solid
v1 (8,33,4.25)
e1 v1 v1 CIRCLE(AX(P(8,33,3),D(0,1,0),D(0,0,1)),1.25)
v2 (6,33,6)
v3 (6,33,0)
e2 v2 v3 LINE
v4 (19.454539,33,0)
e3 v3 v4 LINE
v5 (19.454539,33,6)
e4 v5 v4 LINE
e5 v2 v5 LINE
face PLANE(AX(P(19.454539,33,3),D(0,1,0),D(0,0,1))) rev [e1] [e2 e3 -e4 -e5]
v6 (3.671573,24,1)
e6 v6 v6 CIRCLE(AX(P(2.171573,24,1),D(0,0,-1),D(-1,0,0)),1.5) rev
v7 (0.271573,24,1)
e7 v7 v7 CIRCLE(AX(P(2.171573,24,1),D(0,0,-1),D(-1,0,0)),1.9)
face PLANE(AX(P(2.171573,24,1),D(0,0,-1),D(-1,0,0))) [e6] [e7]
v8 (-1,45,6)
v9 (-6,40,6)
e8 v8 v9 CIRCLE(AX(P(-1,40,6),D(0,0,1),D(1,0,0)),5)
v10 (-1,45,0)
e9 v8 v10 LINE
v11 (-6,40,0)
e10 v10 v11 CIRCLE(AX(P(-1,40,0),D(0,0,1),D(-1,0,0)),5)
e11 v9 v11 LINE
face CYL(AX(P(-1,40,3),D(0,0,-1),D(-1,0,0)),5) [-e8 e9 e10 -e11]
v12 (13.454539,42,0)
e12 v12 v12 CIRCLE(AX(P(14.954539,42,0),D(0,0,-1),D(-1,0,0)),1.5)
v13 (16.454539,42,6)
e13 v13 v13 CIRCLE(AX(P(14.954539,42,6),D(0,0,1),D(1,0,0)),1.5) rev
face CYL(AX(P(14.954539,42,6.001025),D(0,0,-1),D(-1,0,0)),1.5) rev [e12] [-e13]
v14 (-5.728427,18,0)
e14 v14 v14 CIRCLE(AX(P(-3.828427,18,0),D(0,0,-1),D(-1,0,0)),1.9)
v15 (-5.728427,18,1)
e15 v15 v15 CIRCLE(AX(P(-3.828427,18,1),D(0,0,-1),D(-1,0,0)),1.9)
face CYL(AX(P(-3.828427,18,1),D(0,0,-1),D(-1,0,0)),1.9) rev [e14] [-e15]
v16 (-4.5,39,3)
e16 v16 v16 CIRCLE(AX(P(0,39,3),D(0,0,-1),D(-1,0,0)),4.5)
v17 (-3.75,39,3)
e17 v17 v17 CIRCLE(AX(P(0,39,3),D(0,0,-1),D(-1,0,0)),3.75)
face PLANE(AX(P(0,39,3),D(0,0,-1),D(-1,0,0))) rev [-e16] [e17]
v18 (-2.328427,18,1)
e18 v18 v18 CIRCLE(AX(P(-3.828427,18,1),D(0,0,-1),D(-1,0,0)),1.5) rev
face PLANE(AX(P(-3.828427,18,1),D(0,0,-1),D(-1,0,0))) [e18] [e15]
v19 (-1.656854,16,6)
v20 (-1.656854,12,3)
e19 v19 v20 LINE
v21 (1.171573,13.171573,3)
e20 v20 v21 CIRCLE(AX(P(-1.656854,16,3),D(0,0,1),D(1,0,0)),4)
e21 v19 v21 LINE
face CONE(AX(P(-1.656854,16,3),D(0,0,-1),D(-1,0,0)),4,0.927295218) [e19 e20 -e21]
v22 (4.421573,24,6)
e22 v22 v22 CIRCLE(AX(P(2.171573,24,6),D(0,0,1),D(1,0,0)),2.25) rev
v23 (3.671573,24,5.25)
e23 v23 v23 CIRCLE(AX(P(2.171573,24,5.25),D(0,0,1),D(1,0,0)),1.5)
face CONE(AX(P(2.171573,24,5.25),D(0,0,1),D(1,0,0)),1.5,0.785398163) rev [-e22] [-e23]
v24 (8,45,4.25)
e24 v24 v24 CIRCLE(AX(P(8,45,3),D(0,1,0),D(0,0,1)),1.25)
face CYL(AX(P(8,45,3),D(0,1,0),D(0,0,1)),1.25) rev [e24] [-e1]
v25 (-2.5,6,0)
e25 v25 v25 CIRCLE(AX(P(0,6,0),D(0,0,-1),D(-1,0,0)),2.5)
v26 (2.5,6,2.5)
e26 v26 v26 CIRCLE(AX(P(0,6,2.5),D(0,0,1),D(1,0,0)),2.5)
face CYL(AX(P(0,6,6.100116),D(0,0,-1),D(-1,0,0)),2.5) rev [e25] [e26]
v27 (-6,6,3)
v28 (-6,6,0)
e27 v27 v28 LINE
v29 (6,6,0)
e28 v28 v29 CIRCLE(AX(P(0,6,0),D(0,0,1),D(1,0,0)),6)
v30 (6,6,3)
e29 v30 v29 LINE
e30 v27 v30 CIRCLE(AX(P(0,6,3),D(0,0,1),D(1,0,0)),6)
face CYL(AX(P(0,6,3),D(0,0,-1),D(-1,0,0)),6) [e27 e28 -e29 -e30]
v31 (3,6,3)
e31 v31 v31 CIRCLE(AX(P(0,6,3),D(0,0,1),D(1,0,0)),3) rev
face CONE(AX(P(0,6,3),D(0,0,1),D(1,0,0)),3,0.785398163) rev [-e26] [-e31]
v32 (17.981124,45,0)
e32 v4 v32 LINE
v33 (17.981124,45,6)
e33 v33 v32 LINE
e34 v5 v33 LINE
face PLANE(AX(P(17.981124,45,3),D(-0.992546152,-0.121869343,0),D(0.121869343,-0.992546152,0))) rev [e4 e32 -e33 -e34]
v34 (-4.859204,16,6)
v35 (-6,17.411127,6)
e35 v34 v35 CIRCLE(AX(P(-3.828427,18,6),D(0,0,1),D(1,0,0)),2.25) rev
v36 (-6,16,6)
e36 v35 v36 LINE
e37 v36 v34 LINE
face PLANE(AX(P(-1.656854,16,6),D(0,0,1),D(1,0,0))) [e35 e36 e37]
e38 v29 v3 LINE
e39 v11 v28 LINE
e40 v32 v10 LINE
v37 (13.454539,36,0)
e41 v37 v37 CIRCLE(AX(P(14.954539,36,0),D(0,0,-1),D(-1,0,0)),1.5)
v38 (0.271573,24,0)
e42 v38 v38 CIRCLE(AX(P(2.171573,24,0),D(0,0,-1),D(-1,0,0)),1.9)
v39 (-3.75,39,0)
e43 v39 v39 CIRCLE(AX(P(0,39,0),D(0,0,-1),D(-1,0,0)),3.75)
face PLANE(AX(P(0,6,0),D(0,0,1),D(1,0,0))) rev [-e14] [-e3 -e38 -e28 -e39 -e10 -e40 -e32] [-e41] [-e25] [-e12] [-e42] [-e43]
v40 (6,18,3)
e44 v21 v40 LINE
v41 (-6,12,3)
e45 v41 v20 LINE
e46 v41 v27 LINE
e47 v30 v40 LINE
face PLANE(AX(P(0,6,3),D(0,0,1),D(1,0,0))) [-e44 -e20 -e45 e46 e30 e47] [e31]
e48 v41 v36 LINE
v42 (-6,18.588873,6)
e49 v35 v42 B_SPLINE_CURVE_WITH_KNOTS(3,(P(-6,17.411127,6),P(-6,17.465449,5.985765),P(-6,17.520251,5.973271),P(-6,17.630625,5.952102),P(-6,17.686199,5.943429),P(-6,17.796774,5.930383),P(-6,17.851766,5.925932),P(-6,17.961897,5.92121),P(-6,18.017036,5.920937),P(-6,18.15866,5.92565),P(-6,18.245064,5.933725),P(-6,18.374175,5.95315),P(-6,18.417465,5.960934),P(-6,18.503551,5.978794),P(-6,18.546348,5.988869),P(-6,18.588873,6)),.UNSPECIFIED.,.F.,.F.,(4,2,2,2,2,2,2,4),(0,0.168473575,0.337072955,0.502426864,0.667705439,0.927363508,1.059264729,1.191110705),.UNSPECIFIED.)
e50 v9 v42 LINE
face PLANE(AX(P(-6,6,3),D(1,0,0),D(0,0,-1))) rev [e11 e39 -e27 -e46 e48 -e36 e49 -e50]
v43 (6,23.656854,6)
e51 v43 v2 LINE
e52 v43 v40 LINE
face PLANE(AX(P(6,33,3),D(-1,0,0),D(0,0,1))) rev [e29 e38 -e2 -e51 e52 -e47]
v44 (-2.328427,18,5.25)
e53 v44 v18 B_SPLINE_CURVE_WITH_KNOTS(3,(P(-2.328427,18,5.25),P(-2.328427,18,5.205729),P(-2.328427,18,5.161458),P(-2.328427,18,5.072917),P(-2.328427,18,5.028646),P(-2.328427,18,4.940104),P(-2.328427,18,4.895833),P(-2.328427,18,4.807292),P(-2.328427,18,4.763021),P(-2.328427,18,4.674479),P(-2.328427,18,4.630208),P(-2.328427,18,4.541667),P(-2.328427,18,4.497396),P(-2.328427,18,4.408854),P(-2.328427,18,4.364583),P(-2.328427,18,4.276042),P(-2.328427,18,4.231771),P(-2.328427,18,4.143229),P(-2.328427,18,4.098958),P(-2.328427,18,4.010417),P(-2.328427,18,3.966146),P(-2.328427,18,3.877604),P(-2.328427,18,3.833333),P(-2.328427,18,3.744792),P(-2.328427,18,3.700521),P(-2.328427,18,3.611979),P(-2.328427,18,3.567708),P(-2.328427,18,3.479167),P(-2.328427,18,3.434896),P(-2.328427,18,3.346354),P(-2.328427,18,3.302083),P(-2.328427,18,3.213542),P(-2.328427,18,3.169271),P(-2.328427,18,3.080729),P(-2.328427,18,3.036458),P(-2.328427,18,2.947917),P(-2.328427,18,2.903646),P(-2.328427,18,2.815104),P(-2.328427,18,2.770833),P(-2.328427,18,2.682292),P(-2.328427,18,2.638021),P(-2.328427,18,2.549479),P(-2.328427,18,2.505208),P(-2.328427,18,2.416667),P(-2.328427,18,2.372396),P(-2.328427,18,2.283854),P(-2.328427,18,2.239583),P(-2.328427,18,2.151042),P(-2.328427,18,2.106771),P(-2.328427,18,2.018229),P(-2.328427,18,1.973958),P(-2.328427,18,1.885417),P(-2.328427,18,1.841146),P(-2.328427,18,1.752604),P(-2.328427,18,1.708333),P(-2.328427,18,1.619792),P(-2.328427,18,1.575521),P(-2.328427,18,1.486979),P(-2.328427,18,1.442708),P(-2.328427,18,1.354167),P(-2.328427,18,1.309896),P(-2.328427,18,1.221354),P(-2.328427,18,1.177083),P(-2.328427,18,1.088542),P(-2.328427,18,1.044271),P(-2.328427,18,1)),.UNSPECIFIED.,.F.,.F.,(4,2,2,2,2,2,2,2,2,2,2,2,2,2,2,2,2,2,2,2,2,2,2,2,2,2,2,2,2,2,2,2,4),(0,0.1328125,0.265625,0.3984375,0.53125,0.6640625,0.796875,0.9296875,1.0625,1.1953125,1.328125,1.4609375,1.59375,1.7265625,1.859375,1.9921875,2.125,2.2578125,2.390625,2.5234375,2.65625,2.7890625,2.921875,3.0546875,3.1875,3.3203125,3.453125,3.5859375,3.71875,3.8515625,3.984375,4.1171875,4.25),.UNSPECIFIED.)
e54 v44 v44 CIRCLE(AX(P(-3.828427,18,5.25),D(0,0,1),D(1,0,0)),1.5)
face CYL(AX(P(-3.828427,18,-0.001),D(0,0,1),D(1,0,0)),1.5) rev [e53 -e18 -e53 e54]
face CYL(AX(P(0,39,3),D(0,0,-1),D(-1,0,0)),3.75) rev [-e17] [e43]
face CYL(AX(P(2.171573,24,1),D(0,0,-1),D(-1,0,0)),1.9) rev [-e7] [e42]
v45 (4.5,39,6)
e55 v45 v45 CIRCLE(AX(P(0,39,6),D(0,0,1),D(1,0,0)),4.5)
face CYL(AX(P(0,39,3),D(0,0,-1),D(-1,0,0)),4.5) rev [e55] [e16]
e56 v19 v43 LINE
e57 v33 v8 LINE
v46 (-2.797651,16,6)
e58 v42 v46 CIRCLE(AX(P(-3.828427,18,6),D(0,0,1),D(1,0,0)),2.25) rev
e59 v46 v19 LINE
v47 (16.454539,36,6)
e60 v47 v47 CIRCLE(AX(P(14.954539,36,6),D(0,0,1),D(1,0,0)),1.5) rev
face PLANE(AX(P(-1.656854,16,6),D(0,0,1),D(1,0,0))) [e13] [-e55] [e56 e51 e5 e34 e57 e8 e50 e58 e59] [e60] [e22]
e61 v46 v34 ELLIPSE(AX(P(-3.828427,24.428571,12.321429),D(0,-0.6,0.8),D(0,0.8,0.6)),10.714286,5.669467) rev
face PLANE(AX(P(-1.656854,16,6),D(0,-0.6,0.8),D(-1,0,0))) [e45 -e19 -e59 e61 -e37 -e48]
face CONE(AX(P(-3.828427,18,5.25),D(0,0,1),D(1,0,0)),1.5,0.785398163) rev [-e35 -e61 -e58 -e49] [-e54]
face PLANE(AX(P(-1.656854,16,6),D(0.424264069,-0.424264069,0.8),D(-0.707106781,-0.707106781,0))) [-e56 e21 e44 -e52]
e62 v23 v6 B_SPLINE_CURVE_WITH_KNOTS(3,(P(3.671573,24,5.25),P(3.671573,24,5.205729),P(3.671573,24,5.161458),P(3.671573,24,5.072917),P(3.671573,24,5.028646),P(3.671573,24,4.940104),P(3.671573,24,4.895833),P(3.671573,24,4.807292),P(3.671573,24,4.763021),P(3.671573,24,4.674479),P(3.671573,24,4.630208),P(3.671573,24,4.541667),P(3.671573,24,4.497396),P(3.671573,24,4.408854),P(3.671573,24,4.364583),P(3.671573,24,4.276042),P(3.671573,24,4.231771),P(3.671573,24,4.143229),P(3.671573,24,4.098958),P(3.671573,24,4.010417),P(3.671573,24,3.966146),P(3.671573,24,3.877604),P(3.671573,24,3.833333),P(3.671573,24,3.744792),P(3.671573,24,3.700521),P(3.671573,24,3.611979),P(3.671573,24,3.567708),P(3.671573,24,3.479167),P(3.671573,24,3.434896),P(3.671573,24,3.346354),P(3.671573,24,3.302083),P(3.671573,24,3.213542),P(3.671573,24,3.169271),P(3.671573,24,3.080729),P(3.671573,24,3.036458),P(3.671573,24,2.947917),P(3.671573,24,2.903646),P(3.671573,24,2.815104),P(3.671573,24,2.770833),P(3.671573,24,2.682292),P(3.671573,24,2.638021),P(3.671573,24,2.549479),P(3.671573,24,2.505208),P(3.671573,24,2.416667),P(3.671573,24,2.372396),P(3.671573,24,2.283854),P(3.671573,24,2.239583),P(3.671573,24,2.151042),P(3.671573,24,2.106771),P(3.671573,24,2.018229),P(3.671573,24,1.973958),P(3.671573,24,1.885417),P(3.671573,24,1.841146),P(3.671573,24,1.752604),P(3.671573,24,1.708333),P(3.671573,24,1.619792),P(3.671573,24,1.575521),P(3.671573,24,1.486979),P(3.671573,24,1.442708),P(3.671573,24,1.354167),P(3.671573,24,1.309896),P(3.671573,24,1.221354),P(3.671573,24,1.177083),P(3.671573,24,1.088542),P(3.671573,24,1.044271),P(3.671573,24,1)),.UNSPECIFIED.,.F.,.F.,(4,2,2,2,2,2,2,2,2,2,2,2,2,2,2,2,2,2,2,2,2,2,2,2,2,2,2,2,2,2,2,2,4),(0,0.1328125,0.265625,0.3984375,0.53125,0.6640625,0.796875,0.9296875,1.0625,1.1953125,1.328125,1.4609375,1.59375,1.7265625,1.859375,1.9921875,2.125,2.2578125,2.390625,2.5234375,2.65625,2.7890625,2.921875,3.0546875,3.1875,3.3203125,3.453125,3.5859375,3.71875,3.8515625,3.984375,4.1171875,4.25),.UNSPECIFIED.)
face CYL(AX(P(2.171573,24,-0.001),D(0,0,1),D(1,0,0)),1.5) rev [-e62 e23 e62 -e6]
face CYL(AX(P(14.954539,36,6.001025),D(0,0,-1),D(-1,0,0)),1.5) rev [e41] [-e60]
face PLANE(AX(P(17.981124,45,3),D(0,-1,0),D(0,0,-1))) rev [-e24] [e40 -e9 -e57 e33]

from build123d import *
from OCP.BRepFilletAPI import BRepFilletAPI_MakeChamfer

# Parameters (mm, degrees)
ESBO_O1_R                 = 4.5
RESSALTO_EXTRUS_O1_DEPTH  = 3
ESBO_O2_R                 = 4.5
RESSALTO_EXTRUS_O2_DEPTH  = 3
CHANFRO1_SIZE             = 4
CHANFRO1_SIZE_2           = 3
FURO_ROSCADO_DE_M3X0_51_D = 2.5
ESBO_O6_R                 = 4.5
ESBO_O6_R_2               = 3.75
RESSALTO_EXTRUS_O3_DEPTH  = 3
CORTE_EXTRUS_O1_REACH     = 51.391
ESBO_O7_R                 = 1.5
CORTE_EXTRUS_O2_REACH     = 51.391
ESBO_O8_R                 = 1.5
CHANFRO2_SIZE             = 0.75
CORTE_EXTRUS_O4_REACH     = 51.391
ESBO_O14_R                = 2.5
CHANFRO3_SIZE             = 0.5
ESBO_O15_R                = 1.9
CORTE_EXTRUS_O5_DEPTH     = 1


# Some blends are built 0.0001 mm under size
with BuildPart() as part:
    # Esboço1 → Ressalto-extrusão1 (new body)
    with BuildSketch(Plane.XY):
        with BuildLine():
            Line((-6, 6), (-6, 39))
            Line((-6, 39), (-6, 40))
            ThreePointArc((-6, 40), (-4.535533906, 43.535533906), (-1, 45))
            Line((-1, 45), (17.98112418, 45))
            Line((17.98112418, 45), (19.454538911, 33))
            Line((19.454538911, 33), (17.98112418, 33))
            Line((17.98112418, 33), (6, 33))
            Line((6, 33), (6, 25))
            Line((6, 25), (6, 6))
            ThreePointArc((6, 6), (4.242640687, 1.757359313), (0, 0))
            ThreePointArc((0, 0), (-4.242640687, 1.757359313), (-6, 6))
        make_face()
        with Locations((0, 39)):
            Circle(ESBO_O1_R, mode=Mode.SUBTRACT)
    extrude(amount=RESSALTO_EXTRUS_O1_DEPTH)

    # Esboço2 → Ressalto-extrusão2 (add)
    with BuildSketch(Plane.XY.offset(3)):
        with BuildLine():
            Line((6, 25), (6, 18))
            Line((6, 18), (1.171572875, 13.171572875))
            ThreePointArc((1.171572875, 13.171572875), (-0.12612052, 12.30448187), (-1.656854249, 12))
            Line((-1.656854249, 12), (-6, 12))
            Line((-6, 12), (-6, 25))
            Line((-6, 25), (-6, 40))
            ThreePointArc((-6, 40), (-4.535533906, 43.535533906), (-1, 45))
            Line((-1, 45), (17.98112418, 45))
            Line((17.98112418, 45), (19.454538911, 33))
            Line((19.454538911, 33), (6, 33))
            Line((6, 33), (6, 25))
        make_face()
        with Locations((0, 39)):
            Circle(ESBO_O2_R, mode=Mode.SUBTRACT)
    extrude(amount=RESSALTO_EXTRUS_O2_DEPTH)

    # Chanfro1
    chanfro1_edges_1 = [part.edges().sort_by_distance(p)[0] for p in [
        (3.585786438, 15.585786438, 6),
    ]]
    chanfro1_side_1 = [part.faces().sort_by_distance(p)[0] for p in [
        (3.543360031, 15.628212844, 6),
    ]]
    chanfro1_edges_2 = [part.edges().sort_by_distance(p)[0] for p in [
        (-0.12612052, 12.30448187, 6),
    ]]
    chanfro1_side_2 = [part.faces().sort_by_distance(p)[0] for p in [
        (-0.149081526, 12.359914642, 6),
    ]]
    chanfro1_edges_3 = [part.edges().sort_by_distance(p)[0] for p in [
        (-3.828427125, 12, 6),
    ]]
    chanfro1_side_3 = [part.faces().sort_by_distance(p)[0] for p in [
        (-3.828427125, 12, 5.94),
    ]]
    chanfro1 = BRepFilletAPI_MakeChamfer(part.part.solid().wrapped)
    for e in chanfro1_edges_1:
        chanfro1.Add(CHANFRO1_SIZE - 0.0001, CHANFRO1_SIZE_2 - 0.0001, e.wrapped, chanfro1_side_1[0].wrapped)
    for e in chanfro1_edges_2:
        chanfro1.Add(CHANFRO1_SIZE - 0.0001, CHANFRO1_SIZE_2 - 0.0001, e.wrapped, chanfro1_side_2[0].wrapped)
    for e in chanfro1_edges_3:
        chanfro1.Add(CHANFRO1_SIZE_2 - 0.0001, CHANFRO1_SIZE - 0.0001, e.wrapped, chanfro1_side_3[0].wrapped)
    add(Compound.cast(chanfro1.Shape()), mode=Mode.REPLACE)  # a hair under: the kernel refuses the full size

    # Furo roscado de M3x0.51 (through all)
    with Locations(Plane(origin=(0, 45, 0), x_dir=(1, 0, 0), z_dir=(0, 1, 0))):
        with Locations((8, -3)):
            Hole(FURO_ROSCADO_DE_M3X0_51_D / 2)

    # Esboço6 → Ressalto-extrusão3 (add)
    with BuildSketch(Plane(origin=(0, 0, 0), x_dir=(-1, 0, 0), z_dir=(0, 0, -1))):
        with Locations((0, 39)):
            Circle(ESBO_O6_R)
        with Locations((0, 39)):
            Circle(ESBO_O6_R_2, mode=Mode.SUBTRACT)
    extrude(amount=-RESSALTO_EXTRUS_O3_DEPTH)

    # Esboço7 → Corte-extrusão1 (cut, up to next)
    with BuildSketch(Plane(origin=(0, 0, 0), x_dir=(-1, 0, 0), z_dir=(0, 0, -1)), mode=Mode.PRIVATE) as corte_extrus_o1_sk1:
        with Locations((-14.954538911, 42)):
            Circle(ESBO_O7_R)
    corte_extrus_o1_tool1 = extrude(corte_extrus_o1_sk1.sketch, amount=-CORTE_EXTRUS_O1_REACH, mode=Mode.PRIVATE) & part.part
    # Esboço7 → Corte-extrusão1 (cut, up to next)
    with BuildSketch(Plane(origin=(0, 0, 0), x_dir=(-1, 0, 0), z_dir=(0, 0, -1)), mode=Mode.PRIVATE) as corte_extrus_o1_sk2:
        with Locations((-14.954538911, 36)):
            Circle(ESBO_O7_R)
    corte_extrus_o1_tool2 = extrude(corte_extrus_o1_sk2.sketch, amount=-CORTE_EXTRUS_O1_REACH, mode=Mode.PRIVATE) & part.part
    add(corte_extrus_o1_tool1.solids().sort_by_distance((14.954539, 42, 0))[0], mode=Mode.SUBTRACT)
    add(corte_extrus_o1_tool2.solids().sort_by_distance((14.954539, 36, 0))[0], mode=Mode.SUBTRACT)

    # Esboço8 → Corte-extrusão2 (cut, up to next)
    with BuildSketch(Plane.XY.offset(6), mode=Mode.PRIVATE) as corte_extrus_o2_sk1:
        with Locations((2.171572875, 24)):
            Circle(ESBO_O8_R)
    corte_extrus_o2_tool1 = extrude(corte_extrus_o2_sk1.sketch, amount=-CORTE_EXTRUS_O2_REACH, mode=Mode.PRIVATE) & part.part
    # Esboço8 → Corte-extrusão2 (cut, up to next)
    with BuildSketch(Plane.XY.offset(6), mode=Mode.PRIVATE) as corte_extrus_o2_sk2:
        with Locations((-3.828427125, 18)):
            Circle(ESBO_O8_R)
    corte_extrus_o2_tool2 = extrude(corte_extrus_o2_sk2.sketch, amount=-CORTE_EXTRUS_O2_REACH, mode=Mode.PRIVATE) & part.part
    add(corte_extrus_o2_tool1.solids().sort_by_distance((2.171573, 24, 6))[0], mode=Mode.SUBTRACT)
    add(corte_extrus_o2_tool2.solids().sort_by_distance((-3.828427, 18, 6))[0], mode=Mode.SUBTRACT)

    # Chanfro2
    # the kernel refuses this chamfer: 0.75 mm, written as the material it takes off along each edge
    with BuildSketch(Plane(origin=(2.171572875, 24, 6), x_dir=(1, 0, 0), z_dir=(0, -1, 0))) as chanfro2_piece_1:
        Polygon((1.5 + CHANFRO2_SIZE, 0), (1.5, -CHANFRO2_SIZE), (1.5, 0), align=None)
    revolve(axis=Axis((2.171572875, 24, 6), (0, 0, 1)), mode=Mode.SUBTRACT)
    with BuildSketch(Plane(origin=(-3.828427125, 18, 6), x_dir=(1, 0, 0), z_dir=(0, -1, 0))) as chanfro2_piece_2:
        Polygon((1.5 + CHANFRO2_SIZE, 0), (1.5, -CHANFRO2_SIZE), (1.5, 0), align=None)
    revolve(axis=Axis((-3.828427125, 18, 6), (0, 0, 1)), mode=Mode.SUBTRACT)

    # Esboço14 → Corte-extrusão4 (cut, up to next)
    with BuildSketch(Plane(origin=(0, 0, 0), x_dir=(-1, 0, 0), z_dir=(0, 0, -1)), mode=Mode.PRIVATE) as corte_extrus_o4_sk1:
        with Locations((0, 6)):
            Circle(ESBO_O14_R)
    corte_extrus_o4_tool1 = extrude(corte_extrus_o4_sk1.sketch, amount=-CORTE_EXTRUS_O4_REACH, mode=Mode.PRIVATE) & part.part
    add(corte_extrus_o4_tool1.solids().sort_by_distance((0, 6, 0))[0], mode=Mode.SUBTRACT)

    # Chanfro3
    chanfro3_edges = [part.edges().sort_by_distance(p)[0] for p in [
        (2.5, 6, 3),
    ]]
    chamfer(chanfro3_edges, length=CHANFRO3_SIZE)

    # Esboço15 → Corte-extrusão5 (cut)
    with BuildSketch(Plane(origin=(0, 0, 0), x_dir=(-1, 0, 0), z_dir=(0, 0, -1))):
        with Locations((-2.171572875, 24)):
            Circle(ESBO_O15_R)
        with Locations((3.828427125, 18)):
            Circle(ESBO_O15_R)
    extrude(amount=-CORTE_EXTRUS_O5_DEPTH, mode=Mode.SUBTRACT)


solid = part.part
